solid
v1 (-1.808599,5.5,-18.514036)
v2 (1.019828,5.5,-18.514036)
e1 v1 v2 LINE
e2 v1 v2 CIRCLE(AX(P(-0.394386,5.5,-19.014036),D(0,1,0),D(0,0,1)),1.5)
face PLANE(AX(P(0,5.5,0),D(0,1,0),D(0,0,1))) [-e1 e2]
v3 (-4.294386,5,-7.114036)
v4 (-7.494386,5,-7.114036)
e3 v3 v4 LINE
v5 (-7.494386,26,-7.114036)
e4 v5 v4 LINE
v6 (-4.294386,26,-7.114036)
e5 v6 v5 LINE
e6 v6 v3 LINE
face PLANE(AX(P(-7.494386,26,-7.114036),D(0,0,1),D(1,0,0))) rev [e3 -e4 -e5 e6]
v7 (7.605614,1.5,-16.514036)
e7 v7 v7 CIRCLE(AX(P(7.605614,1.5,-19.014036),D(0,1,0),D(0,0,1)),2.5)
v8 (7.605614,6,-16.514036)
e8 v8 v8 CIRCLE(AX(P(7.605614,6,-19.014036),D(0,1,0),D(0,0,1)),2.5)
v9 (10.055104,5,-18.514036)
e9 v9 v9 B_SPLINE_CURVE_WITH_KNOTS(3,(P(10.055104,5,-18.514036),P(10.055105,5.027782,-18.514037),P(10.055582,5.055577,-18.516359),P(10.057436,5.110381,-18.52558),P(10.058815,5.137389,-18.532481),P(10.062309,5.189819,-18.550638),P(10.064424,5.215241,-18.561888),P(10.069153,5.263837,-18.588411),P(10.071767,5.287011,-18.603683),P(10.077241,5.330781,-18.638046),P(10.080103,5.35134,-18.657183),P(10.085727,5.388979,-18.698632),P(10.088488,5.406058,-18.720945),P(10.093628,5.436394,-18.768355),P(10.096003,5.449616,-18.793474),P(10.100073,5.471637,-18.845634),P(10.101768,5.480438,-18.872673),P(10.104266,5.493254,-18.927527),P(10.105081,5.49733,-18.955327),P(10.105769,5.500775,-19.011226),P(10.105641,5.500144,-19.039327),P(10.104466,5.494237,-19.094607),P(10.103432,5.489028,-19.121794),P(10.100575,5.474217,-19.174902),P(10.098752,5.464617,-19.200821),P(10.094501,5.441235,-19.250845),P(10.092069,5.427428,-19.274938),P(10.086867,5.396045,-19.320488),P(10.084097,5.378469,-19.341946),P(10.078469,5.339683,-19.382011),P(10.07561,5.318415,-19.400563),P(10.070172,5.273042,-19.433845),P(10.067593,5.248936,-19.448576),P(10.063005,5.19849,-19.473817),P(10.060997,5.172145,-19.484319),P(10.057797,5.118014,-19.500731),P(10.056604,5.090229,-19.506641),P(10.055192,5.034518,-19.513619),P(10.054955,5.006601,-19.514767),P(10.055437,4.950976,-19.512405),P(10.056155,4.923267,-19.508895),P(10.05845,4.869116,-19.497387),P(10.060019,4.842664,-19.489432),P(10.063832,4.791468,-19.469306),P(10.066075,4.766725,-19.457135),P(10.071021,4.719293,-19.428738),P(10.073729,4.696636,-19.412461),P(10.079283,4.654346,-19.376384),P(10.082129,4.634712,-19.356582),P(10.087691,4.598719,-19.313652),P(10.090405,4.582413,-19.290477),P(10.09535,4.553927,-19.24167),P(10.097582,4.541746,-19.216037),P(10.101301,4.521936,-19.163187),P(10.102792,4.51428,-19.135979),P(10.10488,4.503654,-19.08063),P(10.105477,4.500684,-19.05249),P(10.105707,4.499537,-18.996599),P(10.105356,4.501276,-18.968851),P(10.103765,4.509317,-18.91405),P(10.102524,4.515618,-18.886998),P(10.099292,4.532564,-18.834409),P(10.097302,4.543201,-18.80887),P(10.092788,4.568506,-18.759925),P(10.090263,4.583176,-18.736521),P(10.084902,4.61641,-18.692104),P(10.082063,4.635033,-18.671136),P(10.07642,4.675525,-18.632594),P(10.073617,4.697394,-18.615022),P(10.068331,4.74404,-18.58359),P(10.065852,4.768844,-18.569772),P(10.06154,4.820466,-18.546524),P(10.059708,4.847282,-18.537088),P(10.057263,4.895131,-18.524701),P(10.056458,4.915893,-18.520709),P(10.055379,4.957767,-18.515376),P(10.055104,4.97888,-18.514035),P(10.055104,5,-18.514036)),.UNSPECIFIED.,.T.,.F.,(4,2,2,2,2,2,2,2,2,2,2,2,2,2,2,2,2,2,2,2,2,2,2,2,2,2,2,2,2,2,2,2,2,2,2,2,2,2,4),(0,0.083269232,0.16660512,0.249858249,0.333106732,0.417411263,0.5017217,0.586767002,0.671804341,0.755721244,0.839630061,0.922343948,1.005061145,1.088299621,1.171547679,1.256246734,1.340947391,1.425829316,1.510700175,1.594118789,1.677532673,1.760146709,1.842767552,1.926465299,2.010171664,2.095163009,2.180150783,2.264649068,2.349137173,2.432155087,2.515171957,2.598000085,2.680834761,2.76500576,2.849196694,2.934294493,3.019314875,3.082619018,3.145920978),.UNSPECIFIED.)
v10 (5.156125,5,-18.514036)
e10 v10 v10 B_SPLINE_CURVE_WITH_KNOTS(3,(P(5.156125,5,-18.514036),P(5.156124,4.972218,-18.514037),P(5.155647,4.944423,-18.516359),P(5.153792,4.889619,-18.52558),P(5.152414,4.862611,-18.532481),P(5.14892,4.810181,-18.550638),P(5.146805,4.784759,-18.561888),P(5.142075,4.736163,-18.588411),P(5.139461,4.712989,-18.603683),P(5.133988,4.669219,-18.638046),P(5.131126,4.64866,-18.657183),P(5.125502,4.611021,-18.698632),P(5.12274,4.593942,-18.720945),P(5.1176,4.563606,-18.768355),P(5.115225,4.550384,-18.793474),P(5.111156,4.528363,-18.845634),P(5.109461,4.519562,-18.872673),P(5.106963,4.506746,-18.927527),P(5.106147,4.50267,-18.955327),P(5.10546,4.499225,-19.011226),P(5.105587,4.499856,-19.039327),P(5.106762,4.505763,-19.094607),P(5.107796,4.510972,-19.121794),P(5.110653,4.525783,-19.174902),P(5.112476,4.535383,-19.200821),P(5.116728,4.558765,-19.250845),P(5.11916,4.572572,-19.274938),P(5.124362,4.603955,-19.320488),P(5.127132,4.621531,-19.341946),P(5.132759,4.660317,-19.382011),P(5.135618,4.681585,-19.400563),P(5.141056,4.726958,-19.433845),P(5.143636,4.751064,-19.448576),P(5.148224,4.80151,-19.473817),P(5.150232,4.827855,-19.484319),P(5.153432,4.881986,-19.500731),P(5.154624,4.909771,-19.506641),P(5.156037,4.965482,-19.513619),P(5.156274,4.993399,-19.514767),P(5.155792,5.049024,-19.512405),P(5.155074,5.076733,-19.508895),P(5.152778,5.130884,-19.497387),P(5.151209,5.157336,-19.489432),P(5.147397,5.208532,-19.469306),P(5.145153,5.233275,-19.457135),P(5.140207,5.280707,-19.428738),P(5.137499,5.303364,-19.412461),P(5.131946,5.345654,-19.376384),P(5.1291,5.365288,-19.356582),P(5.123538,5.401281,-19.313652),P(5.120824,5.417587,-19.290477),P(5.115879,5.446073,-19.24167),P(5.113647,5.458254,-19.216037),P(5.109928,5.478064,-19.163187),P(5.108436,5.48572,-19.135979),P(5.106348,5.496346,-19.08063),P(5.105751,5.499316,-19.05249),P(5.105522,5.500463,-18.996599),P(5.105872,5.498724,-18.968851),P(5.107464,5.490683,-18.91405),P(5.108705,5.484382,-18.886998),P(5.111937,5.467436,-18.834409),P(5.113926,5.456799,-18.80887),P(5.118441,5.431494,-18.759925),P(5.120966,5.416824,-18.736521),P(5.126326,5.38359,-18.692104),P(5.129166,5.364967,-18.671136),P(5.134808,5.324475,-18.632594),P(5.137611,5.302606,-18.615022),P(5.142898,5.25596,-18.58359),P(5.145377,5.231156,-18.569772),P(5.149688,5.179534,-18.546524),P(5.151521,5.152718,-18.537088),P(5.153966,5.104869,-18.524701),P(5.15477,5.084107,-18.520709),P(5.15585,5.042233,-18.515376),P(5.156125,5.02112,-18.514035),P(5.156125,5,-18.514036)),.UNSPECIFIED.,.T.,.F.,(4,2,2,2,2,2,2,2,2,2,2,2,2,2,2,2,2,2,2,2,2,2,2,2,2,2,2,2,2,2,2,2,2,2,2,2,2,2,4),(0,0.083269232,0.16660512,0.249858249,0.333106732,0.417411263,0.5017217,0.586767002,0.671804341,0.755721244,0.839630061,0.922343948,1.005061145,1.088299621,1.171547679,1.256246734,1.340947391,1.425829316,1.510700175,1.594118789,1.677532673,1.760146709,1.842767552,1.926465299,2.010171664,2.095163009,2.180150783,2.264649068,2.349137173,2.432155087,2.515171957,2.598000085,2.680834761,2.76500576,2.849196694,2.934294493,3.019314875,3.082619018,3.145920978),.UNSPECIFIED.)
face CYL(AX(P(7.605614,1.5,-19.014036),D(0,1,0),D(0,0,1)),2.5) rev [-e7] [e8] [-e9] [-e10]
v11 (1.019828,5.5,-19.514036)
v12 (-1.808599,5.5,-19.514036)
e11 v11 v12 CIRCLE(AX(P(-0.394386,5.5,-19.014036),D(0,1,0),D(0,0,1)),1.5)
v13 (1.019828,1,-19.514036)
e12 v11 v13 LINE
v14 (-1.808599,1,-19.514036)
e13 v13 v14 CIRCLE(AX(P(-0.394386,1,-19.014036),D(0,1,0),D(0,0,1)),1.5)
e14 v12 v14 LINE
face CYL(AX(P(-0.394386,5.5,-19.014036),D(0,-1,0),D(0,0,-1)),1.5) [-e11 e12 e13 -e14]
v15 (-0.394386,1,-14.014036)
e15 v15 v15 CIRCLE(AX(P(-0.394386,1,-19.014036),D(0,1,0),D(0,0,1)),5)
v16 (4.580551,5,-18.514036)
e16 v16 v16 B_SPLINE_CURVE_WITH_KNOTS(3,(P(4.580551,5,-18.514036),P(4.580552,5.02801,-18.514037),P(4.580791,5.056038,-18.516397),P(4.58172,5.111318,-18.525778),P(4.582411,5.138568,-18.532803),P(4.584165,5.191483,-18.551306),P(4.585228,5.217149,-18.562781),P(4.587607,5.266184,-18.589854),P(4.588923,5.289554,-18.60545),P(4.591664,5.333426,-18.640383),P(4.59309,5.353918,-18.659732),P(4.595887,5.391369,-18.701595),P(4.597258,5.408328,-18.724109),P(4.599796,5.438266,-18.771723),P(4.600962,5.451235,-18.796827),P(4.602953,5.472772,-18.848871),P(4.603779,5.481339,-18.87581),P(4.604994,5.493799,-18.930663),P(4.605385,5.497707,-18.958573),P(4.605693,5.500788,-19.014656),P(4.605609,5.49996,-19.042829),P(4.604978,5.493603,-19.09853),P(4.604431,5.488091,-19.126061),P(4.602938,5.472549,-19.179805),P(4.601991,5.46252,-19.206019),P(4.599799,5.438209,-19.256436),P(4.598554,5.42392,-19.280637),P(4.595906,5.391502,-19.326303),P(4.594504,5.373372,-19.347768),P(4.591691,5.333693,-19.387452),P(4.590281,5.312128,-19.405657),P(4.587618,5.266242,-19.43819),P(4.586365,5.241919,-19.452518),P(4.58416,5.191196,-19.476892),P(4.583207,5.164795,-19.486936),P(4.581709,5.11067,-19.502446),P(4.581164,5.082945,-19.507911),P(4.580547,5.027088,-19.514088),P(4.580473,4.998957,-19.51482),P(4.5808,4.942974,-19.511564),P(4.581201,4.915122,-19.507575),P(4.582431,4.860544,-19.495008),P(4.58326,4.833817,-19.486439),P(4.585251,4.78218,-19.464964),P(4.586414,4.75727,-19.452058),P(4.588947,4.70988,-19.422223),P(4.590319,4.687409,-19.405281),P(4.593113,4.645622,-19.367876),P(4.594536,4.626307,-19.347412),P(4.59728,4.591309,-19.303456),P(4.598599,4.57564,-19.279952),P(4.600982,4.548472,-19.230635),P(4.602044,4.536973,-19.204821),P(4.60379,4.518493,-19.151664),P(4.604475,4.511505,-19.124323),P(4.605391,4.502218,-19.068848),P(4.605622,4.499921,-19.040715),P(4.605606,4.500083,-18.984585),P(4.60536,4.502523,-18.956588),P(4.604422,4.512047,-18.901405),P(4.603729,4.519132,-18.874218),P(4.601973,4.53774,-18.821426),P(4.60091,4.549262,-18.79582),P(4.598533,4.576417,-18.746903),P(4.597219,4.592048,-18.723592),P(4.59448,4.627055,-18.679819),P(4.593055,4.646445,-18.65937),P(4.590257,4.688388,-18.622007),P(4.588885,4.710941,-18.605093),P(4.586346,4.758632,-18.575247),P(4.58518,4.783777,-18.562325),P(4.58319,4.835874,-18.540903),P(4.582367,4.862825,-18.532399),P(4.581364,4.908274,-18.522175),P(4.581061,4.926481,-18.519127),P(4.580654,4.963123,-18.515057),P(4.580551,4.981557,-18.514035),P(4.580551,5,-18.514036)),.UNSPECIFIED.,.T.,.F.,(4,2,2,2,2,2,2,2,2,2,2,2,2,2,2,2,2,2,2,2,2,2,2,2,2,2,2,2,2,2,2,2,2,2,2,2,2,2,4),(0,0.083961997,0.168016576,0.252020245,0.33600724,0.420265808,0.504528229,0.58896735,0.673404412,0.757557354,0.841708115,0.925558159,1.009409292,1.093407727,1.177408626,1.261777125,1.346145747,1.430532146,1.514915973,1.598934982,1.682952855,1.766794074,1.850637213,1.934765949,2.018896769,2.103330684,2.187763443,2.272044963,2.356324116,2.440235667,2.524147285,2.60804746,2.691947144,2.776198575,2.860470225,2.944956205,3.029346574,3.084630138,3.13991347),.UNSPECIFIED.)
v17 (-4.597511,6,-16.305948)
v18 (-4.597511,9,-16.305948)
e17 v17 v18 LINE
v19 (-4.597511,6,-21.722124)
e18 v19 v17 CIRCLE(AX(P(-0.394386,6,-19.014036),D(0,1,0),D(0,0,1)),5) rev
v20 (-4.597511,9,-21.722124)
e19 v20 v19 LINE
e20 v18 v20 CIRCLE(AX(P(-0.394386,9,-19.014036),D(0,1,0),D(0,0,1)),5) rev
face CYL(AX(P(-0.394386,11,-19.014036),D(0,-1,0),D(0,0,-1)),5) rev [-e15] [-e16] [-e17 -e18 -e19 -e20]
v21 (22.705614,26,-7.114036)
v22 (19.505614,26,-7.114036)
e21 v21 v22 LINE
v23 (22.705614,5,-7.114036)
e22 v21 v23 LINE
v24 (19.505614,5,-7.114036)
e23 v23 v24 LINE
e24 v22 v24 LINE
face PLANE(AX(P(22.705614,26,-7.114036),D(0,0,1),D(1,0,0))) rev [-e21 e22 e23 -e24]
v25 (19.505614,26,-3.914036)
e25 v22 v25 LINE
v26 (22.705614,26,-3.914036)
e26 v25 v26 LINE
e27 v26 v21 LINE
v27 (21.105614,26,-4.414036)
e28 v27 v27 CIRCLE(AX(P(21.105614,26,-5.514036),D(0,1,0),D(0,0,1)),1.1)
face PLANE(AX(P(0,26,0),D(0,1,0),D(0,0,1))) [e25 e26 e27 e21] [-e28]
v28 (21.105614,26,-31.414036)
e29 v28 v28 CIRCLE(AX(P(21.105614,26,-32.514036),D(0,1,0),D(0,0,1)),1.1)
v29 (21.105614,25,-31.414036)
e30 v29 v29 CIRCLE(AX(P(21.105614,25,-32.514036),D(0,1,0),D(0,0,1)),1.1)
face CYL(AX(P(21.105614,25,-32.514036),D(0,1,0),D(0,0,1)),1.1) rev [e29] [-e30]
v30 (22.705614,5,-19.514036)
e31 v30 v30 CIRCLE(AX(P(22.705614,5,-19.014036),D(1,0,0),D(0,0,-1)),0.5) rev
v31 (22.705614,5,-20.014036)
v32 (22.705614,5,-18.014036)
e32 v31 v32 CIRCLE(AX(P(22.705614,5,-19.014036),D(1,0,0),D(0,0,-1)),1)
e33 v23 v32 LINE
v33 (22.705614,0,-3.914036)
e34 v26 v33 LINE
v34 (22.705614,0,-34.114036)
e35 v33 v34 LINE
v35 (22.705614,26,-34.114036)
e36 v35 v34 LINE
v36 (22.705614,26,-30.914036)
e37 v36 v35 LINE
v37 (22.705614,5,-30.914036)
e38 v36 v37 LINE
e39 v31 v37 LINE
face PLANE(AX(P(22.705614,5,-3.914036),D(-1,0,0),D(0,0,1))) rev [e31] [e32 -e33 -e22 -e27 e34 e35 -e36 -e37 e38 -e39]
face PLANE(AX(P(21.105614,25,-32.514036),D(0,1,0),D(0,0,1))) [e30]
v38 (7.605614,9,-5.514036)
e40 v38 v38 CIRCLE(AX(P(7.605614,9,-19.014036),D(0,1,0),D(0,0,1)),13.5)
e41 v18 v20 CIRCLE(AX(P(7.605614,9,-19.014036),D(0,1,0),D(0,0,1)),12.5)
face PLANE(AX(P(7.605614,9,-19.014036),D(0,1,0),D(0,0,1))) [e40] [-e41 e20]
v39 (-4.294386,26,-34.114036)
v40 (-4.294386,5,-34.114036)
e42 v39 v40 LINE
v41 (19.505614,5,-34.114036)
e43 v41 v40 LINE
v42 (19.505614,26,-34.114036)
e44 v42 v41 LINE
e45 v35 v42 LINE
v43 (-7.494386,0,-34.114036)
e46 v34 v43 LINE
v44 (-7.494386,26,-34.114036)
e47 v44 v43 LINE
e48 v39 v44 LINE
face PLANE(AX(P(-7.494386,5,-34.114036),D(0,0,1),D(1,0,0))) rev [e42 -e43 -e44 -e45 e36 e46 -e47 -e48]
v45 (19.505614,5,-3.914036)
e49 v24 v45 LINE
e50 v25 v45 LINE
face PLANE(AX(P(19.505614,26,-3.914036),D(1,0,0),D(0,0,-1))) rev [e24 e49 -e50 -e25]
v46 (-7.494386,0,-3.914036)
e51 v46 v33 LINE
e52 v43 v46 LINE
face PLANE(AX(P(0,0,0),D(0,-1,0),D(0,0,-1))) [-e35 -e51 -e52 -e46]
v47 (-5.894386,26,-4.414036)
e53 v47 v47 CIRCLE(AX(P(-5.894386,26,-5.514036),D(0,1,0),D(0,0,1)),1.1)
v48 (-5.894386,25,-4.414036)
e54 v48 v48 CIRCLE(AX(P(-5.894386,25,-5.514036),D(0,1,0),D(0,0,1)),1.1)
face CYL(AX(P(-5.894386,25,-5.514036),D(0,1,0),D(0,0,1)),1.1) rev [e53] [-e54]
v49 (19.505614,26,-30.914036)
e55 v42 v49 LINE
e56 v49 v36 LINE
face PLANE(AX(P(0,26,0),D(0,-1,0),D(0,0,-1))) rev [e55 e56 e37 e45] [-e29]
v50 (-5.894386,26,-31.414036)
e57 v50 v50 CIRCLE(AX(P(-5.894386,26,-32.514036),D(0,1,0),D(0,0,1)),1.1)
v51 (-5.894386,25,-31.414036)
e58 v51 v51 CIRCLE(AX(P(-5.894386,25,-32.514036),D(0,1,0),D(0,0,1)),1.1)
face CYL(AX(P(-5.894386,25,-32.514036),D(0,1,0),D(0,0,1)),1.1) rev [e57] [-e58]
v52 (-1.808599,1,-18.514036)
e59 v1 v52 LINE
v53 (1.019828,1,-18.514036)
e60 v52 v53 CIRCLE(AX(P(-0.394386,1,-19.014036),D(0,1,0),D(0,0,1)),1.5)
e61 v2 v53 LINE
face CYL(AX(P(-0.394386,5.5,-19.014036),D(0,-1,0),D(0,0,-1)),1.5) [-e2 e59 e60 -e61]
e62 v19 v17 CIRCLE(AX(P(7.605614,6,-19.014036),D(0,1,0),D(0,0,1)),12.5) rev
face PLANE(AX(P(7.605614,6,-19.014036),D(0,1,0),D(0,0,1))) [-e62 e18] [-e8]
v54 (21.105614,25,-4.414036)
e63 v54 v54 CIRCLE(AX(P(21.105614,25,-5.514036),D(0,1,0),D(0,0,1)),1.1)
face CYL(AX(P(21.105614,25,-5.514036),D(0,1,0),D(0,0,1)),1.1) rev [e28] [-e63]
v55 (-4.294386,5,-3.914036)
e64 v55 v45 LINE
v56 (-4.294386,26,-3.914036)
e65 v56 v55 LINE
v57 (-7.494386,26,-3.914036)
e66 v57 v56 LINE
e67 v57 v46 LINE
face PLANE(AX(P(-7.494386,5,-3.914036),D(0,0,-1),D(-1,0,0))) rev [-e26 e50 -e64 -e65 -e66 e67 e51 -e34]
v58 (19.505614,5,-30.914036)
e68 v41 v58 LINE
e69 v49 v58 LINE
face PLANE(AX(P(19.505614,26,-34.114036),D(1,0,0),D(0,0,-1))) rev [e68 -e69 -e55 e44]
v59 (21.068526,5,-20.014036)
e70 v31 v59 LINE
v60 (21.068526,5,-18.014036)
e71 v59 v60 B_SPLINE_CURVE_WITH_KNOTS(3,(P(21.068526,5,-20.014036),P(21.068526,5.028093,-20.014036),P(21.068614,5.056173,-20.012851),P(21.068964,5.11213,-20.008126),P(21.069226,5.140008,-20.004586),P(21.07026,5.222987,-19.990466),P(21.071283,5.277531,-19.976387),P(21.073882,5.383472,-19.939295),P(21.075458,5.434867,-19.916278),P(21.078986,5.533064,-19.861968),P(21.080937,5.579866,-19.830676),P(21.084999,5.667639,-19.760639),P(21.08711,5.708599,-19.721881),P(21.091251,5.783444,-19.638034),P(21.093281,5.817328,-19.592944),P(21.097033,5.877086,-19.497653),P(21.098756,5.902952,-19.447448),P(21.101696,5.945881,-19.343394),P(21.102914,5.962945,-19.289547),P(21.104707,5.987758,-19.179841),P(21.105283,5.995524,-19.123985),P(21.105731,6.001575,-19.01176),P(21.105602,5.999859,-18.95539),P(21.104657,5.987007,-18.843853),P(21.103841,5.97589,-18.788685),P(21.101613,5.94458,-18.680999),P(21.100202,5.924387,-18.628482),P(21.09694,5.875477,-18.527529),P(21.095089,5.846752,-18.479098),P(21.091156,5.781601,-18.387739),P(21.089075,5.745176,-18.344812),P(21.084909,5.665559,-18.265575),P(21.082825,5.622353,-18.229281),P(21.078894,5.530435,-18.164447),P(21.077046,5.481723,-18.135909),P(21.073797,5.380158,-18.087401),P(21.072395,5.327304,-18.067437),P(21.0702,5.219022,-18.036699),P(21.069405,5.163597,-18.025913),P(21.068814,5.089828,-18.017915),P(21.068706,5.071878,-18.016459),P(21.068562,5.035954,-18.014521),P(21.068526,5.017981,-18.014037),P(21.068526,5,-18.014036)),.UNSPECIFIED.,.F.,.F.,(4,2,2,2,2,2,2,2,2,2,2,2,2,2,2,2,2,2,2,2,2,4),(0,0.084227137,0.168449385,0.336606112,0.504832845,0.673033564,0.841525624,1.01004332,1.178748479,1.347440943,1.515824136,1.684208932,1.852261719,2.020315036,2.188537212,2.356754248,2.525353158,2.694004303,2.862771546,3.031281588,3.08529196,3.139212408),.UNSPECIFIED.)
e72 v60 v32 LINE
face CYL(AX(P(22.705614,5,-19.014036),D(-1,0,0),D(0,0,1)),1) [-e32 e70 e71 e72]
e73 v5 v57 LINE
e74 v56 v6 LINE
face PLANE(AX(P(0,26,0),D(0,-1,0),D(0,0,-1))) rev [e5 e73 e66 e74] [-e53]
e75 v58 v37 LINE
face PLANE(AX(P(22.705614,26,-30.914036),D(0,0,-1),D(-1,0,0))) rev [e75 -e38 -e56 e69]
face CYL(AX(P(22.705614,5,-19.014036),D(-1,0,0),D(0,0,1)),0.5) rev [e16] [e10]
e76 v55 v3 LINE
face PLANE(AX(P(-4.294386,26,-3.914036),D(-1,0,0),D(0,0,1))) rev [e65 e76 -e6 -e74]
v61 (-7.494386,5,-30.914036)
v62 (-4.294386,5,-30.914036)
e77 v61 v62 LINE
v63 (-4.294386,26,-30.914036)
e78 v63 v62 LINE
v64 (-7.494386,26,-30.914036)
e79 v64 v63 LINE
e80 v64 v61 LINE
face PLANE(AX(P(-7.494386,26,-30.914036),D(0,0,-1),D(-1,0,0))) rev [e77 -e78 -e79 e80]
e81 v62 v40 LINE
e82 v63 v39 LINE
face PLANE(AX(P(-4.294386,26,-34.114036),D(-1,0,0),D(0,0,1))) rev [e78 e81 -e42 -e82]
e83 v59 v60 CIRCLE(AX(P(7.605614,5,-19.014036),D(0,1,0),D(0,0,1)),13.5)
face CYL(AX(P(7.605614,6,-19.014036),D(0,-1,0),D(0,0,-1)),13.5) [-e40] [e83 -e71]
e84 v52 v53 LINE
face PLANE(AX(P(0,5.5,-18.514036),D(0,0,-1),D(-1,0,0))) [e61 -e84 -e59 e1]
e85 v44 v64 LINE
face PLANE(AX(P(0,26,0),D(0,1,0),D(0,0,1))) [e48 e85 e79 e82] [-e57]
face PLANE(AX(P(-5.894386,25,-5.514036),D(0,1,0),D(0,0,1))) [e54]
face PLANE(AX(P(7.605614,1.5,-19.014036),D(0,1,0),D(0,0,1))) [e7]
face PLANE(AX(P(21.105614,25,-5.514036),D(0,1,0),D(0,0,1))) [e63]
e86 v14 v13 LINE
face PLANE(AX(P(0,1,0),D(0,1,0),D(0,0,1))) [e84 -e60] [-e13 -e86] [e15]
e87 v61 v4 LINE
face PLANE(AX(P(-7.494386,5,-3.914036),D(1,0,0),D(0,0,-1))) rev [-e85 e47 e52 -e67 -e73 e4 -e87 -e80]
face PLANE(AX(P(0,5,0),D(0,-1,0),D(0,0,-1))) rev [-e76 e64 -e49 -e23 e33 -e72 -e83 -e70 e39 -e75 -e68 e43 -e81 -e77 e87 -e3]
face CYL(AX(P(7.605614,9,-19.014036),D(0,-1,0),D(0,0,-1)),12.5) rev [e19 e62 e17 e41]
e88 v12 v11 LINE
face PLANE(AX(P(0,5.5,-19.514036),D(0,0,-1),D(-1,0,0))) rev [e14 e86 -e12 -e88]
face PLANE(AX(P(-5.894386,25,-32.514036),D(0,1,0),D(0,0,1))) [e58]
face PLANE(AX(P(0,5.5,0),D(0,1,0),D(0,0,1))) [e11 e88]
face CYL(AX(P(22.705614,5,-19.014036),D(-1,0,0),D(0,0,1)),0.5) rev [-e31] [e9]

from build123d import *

# Parameters (mm, degrees)
SKETCH1_W               = 30.2
SKETCH1_H               = 30.2
BOSS_EXTRUDE1_DEPTH     = 5
SKETCH2_R               = 13.5
BOSS_EXTRUDE2_DEPTH     = 1
SKETCH3_R               = 2.5
CUT_EXTRUDE1_DEPTH      = 4.5
SKETCH4_R               = 13.5
SKETCH4_R_2             = 12.5
BOSS_EXTRUDE3_DEPTH     = 3
CUT_EXTRUDE2_DEPTH      = 5
CUT_EXTRUDE2_DEPTH_BACK = 5
SKETCH5_R               = 5
BOSS_EXTRUDE4_DEPTH     = 4.5
SKETCH7_R               = 1
SKETCH7_R_2             = 0.5
CUT_SWEEP1_START        = 4.580551388
CUT_SWEEP1_OUTLINE_R    = 0.5
CUT_SWEEP1_DEPTH        = 18.125062915
SKETCH10_R              = 2.5
CUT_EXTRUDE3_DEPTH      = 3
SKETCH12_W              = 3.2
SKETCH12_H              = 3.2
BOSS_EXTRUDE5_DEPTH     = 21
SKETCH15_R              = 1.1
CUT_EXTRUDE4_DEPTH      = 1


# Read off the part's stored shape, not the designer's step: Cut-Sweep1
with BuildPart() as part:
    # Sketch1 → Boss-Extrude1 (new body)
    with BuildSketch(Plane(origin=(0, 0, 0), x_dir=(1, 0, 0), z_dir=(0, 1, 0))):
        with Locations((7.605614303, 19.014035757)):
            Rectangle(SKETCH1_W, SKETCH1_H)
    extrude(amount=BOSS_EXTRUDE1_DEPTH)

    # Sketch2 → Boss-Extrude2 (add)
    with BuildSketch(Plane(origin=(0, 5, 0), x_dir=(1, 0, 0), z_dir=(0, 1, 0))):
        with Locations(Location((7.605614303, 19.014035757, 0), (0, 0, 270))):
            Circle(SKETCH2_R)
    extrude(amount=BOSS_EXTRUDE2_DEPTH)

    # Sketch3 → Cut-Extrude1 (cut)
    with BuildSketch(Plane(origin=(0, 6, 0), x_dir=(1, 0, 0), z_dir=(0, 1, 0))):
        with Locations(Location((7.605614303, 19.014035757, 0), (0, 0, 270))):
            Circle(SKETCH3_R)
    extrude(amount=-CUT_EXTRUDE1_DEPTH, mode=Mode.SUBTRACT)

    # Sketch4 → Boss-Extrude3 (add)
    with BuildSketch(Plane(origin=(0, 6, 0), x_dir=(1, 0, 0), z_dir=(0, 1, 0))):
        with Locations(Location((7.605614303, 19.014035757, 0), (0, 0, 270))):
            Circle(SKETCH4_R)
        with Locations(Location((7.605614303, 19.014035757, 0), (0, 0, 270))):
            Circle(SKETCH4_R_2, mode=Mode.SUBTRACT)
    extrude(amount=BOSS_EXTRUDE3_DEPTH)

    # Sketch5 → Cut-Extrude2 (cut, two sides: drawn at the far end of the back side and taken through both)
    with BuildSketch(Plane(origin=(0, 6, 0), x_dir=(1, 0, 0), z_dir=(0, 1, 0)).offset(-CUT_EXTRUDE2_DEPTH_BACK)):
        with Locations(Location((-0.394385697, 19.014035757, 0), (0, 0, 147.20617704))):
            Circle(SKETCH5_R)
    extrude(amount=CUT_EXTRUDE2_DEPTH + CUT_EXTRUDE2_DEPTH_BACK, mode=Mode.SUBTRACT)

    # Sketch6 → Boss-Extrude4 (add)
    with BuildSketch(Plane(origin=(0, 1, 0), x_dir=(1, 0, 0), z_dir=(0, 1, 0))):
        with BuildLine():
            ThreePointArc((1.019827865, 19.514035757), (-0.394385697, 20.514035757), (-1.80859926, 19.514035757))
            Line((-1.80859926, 19.514035757), (1.019827865, 19.514035757))
        make_face()
        with BuildLine():
            Line((1.019827865, 18.514035757), (-1.80859926, 18.514035757))
            ThreePointArc((-1.80859926, 18.514035757), (-0.394385697, 17.514035757), (1.019827865, 18.514035757))
        make_face()
    extrude(amount=BOSS_EXTRUDE4_DEPTH)

    # Sweep1: sweep along a path in Sketch8
    with BuildLine(Plane(origin=(0, 5, 0), x_dir=(1, 0, 0), z_dir=(0, 1, 0))) as sweep1_path:
        Line((22.705614303, 19.014035757), (4.605614303, 19.014035757))
    # Sketch7 → Sweep1 (sweep)
    with BuildSketch(Plane(origin=(22.705614303, 0, 0), x_dir=(0, 0, -1), z_dir=(1, 0, 0))):
        with Locations((19.014035757, 5)):
            Circle(SKETCH7_R)
        with Locations((19.014035757, 5)):
            Circle(SKETCH7_R_2, mode=Mode.SUBTRACT)
    sweep(path=sweep1_path.line)

    # Cut-Sweep1 outline → Cut-Sweep1 (cut)
    with BuildSketch(Plane.YZ.offset(CUT_SWEEP1_START)):
        with Locations((5, -19.014035757)):
            Circle(CUT_SWEEP1_OUTLINE_R)
    extrude(amount=CUT_SWEEP1_DEPTH, mode=Mode.SUBTRACT)

    # Sketch10 → Cut-Extrude3 (cut)
    with BuildSketch(Plane(origin=(0, 6, 0), x_dir=(1, 0, 0), z_dir=(0, 1, 0))):
        with Locations(Location((7.605614303, 19.014035757, 0), (0, 0, 270))):
            Circle(SKETCH10_R)
    extrude(amount=-CUT_EXTRUDE3_DEPTH, mode=Mode.SUBTRACT)

    # Sketch12 → Boss-Extrude5 (add)
    with BuildSketch(Plane(origin=(0, 5, 0), x_dir=(1, 0, 0), z_dir=(0, 1, 0))):
        with Locations((-5.894385697, 5.514035757)):
            Rectangle(SKETCH12_W, SKETCH12_H)
        with Locations((21.105614303, 5.514035757)):
            Rectangle(SKETCH12_W, SKETCH12_H)
        with Locations((21.105614303, 32.514035757)):
            Rectangle(SKETCH12_W, SKETCH12_H)
        with Locations((-5.894385697, 32.514035757)):
            Rectangle(SKETCH12_W, SKETCH12_H)
    extrude(amount=BOSS_EXTRUDE5_DEPTH)

    # Sketch15 → Cut-Extrude4 (cut)
    with BuildSketch(Plane(origin=(0, 26, 0), x_dir=(1, 0, 0), z_dir=(0, 1, 0))):
        with Locations(Location((-5.894385697, 5.514035757, 0), (0, 0, 270))):
            Circle(SKETCH15_R)
        with Locations(Location((-5.894385697, 32.514035757, 0), (0, 0, 270))):
            Circle(SKETCH15_R)
        with Locations(Location((21.105614303, 32.514035757, 0), (0, 0, 270))):
            Circle(SKETCH15_R)
        with Locations(Location((21.105614303, 5.514035757, 0), (0, 0, 270))):
            Circle(SKETCH15_R)
    extrude(amount=-CUT_EXTRUDE4_DEPTH, mode=Mode.SUBTRACT)


solid = part.part
